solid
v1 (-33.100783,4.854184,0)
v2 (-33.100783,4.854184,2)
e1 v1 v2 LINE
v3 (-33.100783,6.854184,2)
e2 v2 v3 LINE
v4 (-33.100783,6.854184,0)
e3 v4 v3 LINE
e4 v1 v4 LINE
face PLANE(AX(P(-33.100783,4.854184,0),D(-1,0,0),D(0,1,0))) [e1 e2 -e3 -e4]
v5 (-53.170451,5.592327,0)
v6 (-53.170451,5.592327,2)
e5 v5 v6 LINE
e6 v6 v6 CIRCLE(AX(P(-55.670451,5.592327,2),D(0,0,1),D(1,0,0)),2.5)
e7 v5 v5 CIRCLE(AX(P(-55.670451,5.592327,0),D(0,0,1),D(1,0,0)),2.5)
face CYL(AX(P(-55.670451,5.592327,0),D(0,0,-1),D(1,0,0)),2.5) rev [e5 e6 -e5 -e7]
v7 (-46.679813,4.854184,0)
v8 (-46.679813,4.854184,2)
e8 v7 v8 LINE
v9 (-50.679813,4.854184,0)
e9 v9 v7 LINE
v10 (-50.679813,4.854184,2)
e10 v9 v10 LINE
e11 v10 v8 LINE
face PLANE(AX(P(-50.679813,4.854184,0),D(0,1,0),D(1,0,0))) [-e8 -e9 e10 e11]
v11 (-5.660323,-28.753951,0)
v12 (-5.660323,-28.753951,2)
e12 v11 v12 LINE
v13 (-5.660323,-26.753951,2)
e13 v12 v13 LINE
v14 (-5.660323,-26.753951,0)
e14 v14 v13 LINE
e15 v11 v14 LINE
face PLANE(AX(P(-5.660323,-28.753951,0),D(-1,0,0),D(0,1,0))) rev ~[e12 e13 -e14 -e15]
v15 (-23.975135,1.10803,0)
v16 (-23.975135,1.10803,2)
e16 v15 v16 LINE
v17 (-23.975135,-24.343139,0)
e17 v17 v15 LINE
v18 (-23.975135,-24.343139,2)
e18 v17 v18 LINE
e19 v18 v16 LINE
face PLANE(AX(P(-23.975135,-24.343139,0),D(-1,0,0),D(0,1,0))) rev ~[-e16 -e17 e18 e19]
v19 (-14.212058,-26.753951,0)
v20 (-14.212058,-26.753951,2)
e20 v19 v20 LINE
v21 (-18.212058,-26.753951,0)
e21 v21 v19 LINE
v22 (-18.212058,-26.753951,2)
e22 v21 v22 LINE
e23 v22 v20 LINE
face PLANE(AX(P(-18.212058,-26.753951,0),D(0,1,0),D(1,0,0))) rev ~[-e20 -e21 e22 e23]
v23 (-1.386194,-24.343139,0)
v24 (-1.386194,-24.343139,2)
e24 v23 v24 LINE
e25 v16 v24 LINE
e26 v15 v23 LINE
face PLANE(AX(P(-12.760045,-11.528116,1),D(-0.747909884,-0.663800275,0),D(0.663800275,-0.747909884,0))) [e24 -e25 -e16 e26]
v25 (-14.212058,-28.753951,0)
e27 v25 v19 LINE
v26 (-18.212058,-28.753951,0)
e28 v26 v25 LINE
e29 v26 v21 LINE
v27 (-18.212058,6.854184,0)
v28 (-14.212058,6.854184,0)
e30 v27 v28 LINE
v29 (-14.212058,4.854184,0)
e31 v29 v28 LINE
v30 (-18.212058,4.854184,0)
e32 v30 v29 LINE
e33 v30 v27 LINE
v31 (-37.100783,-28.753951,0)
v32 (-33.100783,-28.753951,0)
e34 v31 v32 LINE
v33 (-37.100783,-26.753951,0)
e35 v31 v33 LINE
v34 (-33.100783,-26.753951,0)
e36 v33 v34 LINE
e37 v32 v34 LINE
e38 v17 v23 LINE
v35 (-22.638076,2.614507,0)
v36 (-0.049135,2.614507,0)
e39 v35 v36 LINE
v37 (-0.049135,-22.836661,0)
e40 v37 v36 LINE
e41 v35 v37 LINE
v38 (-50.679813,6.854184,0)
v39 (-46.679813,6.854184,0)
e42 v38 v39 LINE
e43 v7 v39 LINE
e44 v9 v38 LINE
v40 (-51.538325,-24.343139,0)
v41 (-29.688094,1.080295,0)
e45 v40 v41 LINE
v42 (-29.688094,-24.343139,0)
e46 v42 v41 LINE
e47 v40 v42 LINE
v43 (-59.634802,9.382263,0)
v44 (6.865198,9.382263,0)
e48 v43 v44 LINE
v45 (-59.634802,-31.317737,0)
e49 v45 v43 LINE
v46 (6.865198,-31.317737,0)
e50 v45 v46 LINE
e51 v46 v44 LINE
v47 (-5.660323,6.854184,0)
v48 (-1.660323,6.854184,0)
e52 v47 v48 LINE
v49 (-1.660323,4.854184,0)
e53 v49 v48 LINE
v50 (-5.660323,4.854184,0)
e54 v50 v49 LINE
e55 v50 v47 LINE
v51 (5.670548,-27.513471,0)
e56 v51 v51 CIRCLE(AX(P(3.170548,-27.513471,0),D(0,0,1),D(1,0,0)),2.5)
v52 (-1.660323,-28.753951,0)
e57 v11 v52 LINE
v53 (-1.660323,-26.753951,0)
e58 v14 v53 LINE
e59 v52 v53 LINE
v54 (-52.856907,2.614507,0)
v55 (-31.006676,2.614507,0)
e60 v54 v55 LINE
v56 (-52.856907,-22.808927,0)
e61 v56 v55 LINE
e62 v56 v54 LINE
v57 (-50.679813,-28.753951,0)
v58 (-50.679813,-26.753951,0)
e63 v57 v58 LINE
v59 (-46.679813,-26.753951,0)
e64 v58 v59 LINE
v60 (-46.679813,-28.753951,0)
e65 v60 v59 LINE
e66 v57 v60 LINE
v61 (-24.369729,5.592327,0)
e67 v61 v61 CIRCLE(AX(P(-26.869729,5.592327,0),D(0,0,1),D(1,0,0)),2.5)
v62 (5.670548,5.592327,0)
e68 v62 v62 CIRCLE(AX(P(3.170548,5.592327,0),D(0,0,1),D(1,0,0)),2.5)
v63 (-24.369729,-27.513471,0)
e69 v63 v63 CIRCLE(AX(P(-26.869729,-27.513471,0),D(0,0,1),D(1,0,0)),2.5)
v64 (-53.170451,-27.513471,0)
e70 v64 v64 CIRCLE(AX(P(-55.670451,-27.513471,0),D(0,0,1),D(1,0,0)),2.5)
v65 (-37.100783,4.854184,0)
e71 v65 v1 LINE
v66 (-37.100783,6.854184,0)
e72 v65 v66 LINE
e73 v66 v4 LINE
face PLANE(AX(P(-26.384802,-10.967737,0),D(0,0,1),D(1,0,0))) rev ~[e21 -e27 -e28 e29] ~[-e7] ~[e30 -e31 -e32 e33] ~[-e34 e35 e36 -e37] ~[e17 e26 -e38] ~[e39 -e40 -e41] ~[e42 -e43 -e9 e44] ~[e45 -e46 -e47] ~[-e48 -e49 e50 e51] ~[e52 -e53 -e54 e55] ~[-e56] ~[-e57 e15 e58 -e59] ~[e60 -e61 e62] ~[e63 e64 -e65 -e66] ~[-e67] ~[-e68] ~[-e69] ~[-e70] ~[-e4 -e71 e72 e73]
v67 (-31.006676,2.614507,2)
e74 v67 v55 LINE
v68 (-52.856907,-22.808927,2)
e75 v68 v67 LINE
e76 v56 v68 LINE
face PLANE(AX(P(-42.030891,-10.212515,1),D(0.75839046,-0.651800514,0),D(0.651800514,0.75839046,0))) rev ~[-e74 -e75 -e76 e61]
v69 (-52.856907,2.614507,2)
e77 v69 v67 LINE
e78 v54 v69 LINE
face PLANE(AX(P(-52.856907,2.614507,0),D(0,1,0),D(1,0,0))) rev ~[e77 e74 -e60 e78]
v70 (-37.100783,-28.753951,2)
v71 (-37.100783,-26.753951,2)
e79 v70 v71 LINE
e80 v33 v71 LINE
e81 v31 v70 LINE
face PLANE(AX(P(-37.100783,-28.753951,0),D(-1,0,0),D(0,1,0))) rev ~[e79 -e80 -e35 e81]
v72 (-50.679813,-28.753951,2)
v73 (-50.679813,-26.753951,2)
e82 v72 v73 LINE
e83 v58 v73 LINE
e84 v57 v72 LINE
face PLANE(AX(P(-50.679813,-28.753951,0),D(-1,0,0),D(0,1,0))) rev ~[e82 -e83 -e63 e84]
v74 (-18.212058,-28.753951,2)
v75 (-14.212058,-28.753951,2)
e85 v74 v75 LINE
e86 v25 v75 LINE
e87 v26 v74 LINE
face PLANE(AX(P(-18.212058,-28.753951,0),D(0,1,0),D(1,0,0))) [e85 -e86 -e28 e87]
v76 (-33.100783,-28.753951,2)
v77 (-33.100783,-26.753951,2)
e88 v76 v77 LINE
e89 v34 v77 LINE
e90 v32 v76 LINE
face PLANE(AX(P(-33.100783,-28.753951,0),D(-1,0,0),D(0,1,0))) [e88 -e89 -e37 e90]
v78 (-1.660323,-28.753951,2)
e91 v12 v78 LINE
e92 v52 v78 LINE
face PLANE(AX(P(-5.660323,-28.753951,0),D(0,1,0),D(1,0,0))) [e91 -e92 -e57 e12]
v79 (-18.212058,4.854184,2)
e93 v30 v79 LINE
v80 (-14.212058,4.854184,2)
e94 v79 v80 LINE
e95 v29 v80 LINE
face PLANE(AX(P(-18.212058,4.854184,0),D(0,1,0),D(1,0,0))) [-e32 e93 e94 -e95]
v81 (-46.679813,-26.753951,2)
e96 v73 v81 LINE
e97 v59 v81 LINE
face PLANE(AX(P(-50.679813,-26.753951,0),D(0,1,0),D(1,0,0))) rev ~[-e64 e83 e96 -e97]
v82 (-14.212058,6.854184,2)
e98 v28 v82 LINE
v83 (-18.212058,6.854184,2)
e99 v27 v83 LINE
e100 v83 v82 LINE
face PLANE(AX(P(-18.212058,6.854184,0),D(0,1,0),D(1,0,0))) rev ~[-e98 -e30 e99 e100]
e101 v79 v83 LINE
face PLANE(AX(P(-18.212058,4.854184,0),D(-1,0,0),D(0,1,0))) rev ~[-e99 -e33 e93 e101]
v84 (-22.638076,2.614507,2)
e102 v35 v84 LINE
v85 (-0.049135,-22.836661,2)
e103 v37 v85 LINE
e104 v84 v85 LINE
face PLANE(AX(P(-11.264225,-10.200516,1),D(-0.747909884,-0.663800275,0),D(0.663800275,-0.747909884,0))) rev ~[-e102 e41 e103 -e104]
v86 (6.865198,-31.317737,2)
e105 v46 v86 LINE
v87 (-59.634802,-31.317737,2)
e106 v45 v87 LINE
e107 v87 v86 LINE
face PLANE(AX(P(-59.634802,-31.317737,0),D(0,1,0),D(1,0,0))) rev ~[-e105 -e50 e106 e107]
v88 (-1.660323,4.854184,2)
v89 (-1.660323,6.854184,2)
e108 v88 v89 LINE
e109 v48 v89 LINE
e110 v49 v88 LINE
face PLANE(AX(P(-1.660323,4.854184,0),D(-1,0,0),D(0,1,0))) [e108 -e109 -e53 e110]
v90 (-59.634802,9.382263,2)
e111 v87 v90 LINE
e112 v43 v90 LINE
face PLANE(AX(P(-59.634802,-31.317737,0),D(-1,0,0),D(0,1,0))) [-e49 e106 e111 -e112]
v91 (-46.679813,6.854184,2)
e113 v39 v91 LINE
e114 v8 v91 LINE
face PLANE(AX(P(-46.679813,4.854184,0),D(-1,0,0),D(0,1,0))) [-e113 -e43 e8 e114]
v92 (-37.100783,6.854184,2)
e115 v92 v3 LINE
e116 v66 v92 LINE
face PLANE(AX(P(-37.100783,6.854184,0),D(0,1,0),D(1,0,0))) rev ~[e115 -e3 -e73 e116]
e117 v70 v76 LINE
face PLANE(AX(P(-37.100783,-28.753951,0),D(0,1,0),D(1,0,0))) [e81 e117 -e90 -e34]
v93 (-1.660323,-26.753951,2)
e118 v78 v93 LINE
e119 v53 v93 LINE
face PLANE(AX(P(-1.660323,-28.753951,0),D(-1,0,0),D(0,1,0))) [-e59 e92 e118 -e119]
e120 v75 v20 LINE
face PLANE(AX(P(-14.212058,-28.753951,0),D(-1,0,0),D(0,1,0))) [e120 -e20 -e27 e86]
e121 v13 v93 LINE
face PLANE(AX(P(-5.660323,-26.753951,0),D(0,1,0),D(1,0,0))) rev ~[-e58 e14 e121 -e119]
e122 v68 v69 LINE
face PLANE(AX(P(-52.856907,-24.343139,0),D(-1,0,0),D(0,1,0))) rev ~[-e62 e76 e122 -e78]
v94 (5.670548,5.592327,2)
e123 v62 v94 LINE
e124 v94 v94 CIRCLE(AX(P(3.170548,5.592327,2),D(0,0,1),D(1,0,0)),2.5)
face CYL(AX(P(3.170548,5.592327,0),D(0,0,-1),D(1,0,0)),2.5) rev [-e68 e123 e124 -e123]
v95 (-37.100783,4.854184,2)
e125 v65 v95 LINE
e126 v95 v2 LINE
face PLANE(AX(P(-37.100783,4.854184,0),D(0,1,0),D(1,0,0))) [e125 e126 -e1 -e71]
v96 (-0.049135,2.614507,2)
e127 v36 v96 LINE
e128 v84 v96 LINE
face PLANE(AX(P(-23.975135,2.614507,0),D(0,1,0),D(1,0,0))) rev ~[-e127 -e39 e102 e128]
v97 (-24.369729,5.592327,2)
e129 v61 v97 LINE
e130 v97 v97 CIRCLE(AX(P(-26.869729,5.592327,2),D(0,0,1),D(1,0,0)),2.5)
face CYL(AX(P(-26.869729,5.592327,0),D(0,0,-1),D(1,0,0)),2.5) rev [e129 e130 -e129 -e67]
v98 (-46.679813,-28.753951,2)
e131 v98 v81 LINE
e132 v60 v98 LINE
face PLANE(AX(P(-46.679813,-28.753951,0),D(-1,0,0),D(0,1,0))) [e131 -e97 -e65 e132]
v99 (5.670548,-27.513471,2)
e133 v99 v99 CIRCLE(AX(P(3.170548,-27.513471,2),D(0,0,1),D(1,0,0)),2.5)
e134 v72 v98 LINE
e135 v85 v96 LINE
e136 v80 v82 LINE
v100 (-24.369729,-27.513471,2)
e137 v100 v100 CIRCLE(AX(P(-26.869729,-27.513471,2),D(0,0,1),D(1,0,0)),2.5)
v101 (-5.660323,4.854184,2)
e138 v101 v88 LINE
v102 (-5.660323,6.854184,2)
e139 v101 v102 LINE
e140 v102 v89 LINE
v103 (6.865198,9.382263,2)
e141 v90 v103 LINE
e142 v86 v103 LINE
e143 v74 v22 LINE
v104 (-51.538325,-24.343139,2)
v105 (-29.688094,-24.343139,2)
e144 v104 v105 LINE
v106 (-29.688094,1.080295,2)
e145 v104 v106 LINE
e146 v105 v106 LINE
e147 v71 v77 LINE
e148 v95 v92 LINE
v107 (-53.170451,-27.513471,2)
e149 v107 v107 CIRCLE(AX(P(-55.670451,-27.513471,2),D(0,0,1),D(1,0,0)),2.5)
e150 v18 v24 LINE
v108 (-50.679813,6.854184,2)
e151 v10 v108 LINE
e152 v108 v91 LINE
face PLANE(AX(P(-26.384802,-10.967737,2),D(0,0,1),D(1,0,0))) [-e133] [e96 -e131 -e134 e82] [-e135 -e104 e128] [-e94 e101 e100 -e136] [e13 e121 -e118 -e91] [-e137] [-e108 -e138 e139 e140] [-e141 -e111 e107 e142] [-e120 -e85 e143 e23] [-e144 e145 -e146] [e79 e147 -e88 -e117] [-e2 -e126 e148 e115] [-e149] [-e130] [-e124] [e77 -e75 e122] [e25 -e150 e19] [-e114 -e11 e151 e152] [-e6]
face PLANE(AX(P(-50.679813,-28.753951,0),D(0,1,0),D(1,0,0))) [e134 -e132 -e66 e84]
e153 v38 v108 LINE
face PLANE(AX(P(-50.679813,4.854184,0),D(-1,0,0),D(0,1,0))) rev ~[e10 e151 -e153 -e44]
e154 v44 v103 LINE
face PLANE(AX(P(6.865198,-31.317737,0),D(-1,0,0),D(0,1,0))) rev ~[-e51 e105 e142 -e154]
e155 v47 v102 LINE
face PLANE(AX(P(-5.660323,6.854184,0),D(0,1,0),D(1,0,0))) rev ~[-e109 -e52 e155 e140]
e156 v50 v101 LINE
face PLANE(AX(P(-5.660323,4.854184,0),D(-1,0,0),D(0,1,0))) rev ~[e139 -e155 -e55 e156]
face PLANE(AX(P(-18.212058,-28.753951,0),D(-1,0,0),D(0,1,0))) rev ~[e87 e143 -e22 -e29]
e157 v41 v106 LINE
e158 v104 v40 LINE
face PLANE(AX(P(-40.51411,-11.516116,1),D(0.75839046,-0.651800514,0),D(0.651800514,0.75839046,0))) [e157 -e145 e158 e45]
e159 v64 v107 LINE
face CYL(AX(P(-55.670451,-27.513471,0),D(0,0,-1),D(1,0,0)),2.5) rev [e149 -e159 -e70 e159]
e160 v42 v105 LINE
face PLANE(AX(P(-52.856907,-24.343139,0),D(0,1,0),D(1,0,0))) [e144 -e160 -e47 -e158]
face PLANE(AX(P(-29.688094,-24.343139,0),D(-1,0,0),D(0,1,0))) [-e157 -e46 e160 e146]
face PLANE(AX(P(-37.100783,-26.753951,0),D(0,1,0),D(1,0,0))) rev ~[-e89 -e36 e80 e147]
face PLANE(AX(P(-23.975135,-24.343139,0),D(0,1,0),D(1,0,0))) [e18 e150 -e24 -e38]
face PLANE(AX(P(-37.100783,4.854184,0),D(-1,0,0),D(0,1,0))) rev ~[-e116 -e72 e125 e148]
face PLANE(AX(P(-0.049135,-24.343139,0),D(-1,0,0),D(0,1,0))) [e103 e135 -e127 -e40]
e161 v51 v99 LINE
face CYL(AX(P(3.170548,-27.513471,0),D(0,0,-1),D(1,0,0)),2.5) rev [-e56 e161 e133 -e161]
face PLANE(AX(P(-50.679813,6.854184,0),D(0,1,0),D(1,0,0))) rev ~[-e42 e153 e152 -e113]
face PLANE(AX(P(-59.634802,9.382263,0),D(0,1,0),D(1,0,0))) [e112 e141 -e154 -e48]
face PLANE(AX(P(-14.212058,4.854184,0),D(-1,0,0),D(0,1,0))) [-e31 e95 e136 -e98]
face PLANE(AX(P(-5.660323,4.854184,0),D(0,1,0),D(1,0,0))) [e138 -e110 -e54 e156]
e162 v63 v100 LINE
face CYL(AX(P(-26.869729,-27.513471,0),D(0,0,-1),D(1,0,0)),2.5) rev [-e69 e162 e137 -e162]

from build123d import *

# Parameters (mm, degrees)
F0_W     = 66.5
F0_H     = 40.7
F0_R     = 2.5
F0_W_2   = 4
F0_H_2   = 2
F0_W_3   = 23.1688134372
F0_H_3   = 26.9576453138
F0_W_4   = 23.9260006735
F1_DEPTH = 2
F0_H_4   = 1.6511697322
F0_H_5   = 1.6511703735
F2_E4_W  = 35.5458655395
F2_E4_H  = 2
F3_DEPTH = 1
F4_E5_W  = 36.0439752121
F4_E5_H  = 2
F5_DEPTH = 1


with BuildPart() as f1:
    # F0 (on Top) → F1 (new body)
    with BuildSketch(Plane.XY):
        with Locations((-26.3848016039, -10.9677366539)):
            Rectangle(F0_W, F0_H)
        with Locations((-55.6704513729, -27.5134705007)):
            Circle(F0_R, mode=Mode.SUBTRACT)
        with Locations((-48.6798131391, -27.7539507372)):
            Rectangle(F0_W_2, F0_H_2, mode=Mode.SUBTRACT)
        with Locations((-35.1007831245, -27.7539507372)):
            Rectangle(F0_W_2, F0_H_2, mode=Mode.SUBTRACT)
        with Locations((-26.8697291613, -27.5134705007)):
            Circle(F0_R, mode=Mode.SUBTRACT)
        with Locations((-16.2120581007, -27.7539507372)):
            Rectangle(F0_W_2, F0_H_2, mode=Mode.SUBTRACT)
        with Locations((-3.6603234261, -27.7539507372)):
            Rectangle(F0_W_2, F0_H_2, mode=Mode.SUBTRACT)
        with Locations((3.1705482397, -27.5134705007)):
            Circle(F0_R, mode=Mode.SUBTRACT)
        with Locations((-55.6704513729, 5.5923270993)):
            Circle(F0_R, mode=Mode.SUBTRACT)
        with Locations((-48.6798131391, 5.8541836441)):
            Rectangle(F0_W_2, F0_H_2, mode=Mode.SUBTRACT)
        with Locations((-41.2725005299, -10.8643159037)):
            Rectangle(F0_W_3, F0_H_3, mode=Mode.SUBTRACT)
        with Locations((-35.1007831245, 5.8541836441)):
            Rectangle(F0_W_2, F0_H_2, mode=Mode.SUBTRACT)
        with Locations((-26.8697291613, 5.5923270993)):
            Circle(F0_R, mode=Mode.SUBTRACT)
        with Locations((-12.0121349685, -10.8643159037)):
            Rectangle(F0_W_4, F0_H_3, mode=Mode.SUBTRACT)
        with Locations((-16.2120581007, 5.8541836441)):
            Rectangle(F0_W_2, F0_H_2, mode=Mode.SUBTRACT)
        with Locations((-3.6603234261, 5.8541836441)):
            Rectangle(F0_W_2, F0_H_2, mode=Mode.SUBTRACT)
        with Locations((3.1705482397, 5.5923270993)):
            Circle(F0_R, mode=Mode.SUBTRACT)
    extrude(amount=F1_DEPTH)

    # F2_E4 (on explicit) → F3 (join, symmetric)
    with BuildSketch(Plane(origin=(-52.8569072485, -24.3431385607, 0), x_dir=(0.6518005142, 0.7583904599, 0), z_dir=(0.7583904599, -0.6518005142, 0))):
        with Locations((17.7729327698, 1)):
            Rectangle(F2_E4_W, F2_E4_H)
    extrude(amount=F3_DEPTH, both=True)

    # F4_E5 (on explicit) → F5 (join, symmetric)
    with BuildSketch(Plane(origin=(-23.9751353052, 2.6145067532, 0), x_dir=(0.6638002754, -0.7479098838, 0), z_dir=(-0.7479098838, -0.6638002754, 0))):
        with Locations((18.0219876061, 1)):
            Rectangle(F4_E5_W, F4_E5_H)
    extrude(amount=F5_DEPTH, both=True)


with BuildPart() as f1b:
    # F0 (on Top) → F1, piece 2 (new body)
    with BuildSketch(Plane.XY):
        with Locations((-3.6603234261, 39.867881812)):
            Rectangle(F0_W_2, F0_H_4)
    extrude(amount=F1_DEPTH)


with BuildPart() as f1c:
    # F0 (on Top) → F1, piece 3 (new body)
    with BuildSketch(Plane.XY):
        with Locations((-3.6603234261, -61.797210648)):
            Rectangle(F0_W_2, F0_H_5)
    extrude(amount=F1_DEPTH)


solid = f1.part
